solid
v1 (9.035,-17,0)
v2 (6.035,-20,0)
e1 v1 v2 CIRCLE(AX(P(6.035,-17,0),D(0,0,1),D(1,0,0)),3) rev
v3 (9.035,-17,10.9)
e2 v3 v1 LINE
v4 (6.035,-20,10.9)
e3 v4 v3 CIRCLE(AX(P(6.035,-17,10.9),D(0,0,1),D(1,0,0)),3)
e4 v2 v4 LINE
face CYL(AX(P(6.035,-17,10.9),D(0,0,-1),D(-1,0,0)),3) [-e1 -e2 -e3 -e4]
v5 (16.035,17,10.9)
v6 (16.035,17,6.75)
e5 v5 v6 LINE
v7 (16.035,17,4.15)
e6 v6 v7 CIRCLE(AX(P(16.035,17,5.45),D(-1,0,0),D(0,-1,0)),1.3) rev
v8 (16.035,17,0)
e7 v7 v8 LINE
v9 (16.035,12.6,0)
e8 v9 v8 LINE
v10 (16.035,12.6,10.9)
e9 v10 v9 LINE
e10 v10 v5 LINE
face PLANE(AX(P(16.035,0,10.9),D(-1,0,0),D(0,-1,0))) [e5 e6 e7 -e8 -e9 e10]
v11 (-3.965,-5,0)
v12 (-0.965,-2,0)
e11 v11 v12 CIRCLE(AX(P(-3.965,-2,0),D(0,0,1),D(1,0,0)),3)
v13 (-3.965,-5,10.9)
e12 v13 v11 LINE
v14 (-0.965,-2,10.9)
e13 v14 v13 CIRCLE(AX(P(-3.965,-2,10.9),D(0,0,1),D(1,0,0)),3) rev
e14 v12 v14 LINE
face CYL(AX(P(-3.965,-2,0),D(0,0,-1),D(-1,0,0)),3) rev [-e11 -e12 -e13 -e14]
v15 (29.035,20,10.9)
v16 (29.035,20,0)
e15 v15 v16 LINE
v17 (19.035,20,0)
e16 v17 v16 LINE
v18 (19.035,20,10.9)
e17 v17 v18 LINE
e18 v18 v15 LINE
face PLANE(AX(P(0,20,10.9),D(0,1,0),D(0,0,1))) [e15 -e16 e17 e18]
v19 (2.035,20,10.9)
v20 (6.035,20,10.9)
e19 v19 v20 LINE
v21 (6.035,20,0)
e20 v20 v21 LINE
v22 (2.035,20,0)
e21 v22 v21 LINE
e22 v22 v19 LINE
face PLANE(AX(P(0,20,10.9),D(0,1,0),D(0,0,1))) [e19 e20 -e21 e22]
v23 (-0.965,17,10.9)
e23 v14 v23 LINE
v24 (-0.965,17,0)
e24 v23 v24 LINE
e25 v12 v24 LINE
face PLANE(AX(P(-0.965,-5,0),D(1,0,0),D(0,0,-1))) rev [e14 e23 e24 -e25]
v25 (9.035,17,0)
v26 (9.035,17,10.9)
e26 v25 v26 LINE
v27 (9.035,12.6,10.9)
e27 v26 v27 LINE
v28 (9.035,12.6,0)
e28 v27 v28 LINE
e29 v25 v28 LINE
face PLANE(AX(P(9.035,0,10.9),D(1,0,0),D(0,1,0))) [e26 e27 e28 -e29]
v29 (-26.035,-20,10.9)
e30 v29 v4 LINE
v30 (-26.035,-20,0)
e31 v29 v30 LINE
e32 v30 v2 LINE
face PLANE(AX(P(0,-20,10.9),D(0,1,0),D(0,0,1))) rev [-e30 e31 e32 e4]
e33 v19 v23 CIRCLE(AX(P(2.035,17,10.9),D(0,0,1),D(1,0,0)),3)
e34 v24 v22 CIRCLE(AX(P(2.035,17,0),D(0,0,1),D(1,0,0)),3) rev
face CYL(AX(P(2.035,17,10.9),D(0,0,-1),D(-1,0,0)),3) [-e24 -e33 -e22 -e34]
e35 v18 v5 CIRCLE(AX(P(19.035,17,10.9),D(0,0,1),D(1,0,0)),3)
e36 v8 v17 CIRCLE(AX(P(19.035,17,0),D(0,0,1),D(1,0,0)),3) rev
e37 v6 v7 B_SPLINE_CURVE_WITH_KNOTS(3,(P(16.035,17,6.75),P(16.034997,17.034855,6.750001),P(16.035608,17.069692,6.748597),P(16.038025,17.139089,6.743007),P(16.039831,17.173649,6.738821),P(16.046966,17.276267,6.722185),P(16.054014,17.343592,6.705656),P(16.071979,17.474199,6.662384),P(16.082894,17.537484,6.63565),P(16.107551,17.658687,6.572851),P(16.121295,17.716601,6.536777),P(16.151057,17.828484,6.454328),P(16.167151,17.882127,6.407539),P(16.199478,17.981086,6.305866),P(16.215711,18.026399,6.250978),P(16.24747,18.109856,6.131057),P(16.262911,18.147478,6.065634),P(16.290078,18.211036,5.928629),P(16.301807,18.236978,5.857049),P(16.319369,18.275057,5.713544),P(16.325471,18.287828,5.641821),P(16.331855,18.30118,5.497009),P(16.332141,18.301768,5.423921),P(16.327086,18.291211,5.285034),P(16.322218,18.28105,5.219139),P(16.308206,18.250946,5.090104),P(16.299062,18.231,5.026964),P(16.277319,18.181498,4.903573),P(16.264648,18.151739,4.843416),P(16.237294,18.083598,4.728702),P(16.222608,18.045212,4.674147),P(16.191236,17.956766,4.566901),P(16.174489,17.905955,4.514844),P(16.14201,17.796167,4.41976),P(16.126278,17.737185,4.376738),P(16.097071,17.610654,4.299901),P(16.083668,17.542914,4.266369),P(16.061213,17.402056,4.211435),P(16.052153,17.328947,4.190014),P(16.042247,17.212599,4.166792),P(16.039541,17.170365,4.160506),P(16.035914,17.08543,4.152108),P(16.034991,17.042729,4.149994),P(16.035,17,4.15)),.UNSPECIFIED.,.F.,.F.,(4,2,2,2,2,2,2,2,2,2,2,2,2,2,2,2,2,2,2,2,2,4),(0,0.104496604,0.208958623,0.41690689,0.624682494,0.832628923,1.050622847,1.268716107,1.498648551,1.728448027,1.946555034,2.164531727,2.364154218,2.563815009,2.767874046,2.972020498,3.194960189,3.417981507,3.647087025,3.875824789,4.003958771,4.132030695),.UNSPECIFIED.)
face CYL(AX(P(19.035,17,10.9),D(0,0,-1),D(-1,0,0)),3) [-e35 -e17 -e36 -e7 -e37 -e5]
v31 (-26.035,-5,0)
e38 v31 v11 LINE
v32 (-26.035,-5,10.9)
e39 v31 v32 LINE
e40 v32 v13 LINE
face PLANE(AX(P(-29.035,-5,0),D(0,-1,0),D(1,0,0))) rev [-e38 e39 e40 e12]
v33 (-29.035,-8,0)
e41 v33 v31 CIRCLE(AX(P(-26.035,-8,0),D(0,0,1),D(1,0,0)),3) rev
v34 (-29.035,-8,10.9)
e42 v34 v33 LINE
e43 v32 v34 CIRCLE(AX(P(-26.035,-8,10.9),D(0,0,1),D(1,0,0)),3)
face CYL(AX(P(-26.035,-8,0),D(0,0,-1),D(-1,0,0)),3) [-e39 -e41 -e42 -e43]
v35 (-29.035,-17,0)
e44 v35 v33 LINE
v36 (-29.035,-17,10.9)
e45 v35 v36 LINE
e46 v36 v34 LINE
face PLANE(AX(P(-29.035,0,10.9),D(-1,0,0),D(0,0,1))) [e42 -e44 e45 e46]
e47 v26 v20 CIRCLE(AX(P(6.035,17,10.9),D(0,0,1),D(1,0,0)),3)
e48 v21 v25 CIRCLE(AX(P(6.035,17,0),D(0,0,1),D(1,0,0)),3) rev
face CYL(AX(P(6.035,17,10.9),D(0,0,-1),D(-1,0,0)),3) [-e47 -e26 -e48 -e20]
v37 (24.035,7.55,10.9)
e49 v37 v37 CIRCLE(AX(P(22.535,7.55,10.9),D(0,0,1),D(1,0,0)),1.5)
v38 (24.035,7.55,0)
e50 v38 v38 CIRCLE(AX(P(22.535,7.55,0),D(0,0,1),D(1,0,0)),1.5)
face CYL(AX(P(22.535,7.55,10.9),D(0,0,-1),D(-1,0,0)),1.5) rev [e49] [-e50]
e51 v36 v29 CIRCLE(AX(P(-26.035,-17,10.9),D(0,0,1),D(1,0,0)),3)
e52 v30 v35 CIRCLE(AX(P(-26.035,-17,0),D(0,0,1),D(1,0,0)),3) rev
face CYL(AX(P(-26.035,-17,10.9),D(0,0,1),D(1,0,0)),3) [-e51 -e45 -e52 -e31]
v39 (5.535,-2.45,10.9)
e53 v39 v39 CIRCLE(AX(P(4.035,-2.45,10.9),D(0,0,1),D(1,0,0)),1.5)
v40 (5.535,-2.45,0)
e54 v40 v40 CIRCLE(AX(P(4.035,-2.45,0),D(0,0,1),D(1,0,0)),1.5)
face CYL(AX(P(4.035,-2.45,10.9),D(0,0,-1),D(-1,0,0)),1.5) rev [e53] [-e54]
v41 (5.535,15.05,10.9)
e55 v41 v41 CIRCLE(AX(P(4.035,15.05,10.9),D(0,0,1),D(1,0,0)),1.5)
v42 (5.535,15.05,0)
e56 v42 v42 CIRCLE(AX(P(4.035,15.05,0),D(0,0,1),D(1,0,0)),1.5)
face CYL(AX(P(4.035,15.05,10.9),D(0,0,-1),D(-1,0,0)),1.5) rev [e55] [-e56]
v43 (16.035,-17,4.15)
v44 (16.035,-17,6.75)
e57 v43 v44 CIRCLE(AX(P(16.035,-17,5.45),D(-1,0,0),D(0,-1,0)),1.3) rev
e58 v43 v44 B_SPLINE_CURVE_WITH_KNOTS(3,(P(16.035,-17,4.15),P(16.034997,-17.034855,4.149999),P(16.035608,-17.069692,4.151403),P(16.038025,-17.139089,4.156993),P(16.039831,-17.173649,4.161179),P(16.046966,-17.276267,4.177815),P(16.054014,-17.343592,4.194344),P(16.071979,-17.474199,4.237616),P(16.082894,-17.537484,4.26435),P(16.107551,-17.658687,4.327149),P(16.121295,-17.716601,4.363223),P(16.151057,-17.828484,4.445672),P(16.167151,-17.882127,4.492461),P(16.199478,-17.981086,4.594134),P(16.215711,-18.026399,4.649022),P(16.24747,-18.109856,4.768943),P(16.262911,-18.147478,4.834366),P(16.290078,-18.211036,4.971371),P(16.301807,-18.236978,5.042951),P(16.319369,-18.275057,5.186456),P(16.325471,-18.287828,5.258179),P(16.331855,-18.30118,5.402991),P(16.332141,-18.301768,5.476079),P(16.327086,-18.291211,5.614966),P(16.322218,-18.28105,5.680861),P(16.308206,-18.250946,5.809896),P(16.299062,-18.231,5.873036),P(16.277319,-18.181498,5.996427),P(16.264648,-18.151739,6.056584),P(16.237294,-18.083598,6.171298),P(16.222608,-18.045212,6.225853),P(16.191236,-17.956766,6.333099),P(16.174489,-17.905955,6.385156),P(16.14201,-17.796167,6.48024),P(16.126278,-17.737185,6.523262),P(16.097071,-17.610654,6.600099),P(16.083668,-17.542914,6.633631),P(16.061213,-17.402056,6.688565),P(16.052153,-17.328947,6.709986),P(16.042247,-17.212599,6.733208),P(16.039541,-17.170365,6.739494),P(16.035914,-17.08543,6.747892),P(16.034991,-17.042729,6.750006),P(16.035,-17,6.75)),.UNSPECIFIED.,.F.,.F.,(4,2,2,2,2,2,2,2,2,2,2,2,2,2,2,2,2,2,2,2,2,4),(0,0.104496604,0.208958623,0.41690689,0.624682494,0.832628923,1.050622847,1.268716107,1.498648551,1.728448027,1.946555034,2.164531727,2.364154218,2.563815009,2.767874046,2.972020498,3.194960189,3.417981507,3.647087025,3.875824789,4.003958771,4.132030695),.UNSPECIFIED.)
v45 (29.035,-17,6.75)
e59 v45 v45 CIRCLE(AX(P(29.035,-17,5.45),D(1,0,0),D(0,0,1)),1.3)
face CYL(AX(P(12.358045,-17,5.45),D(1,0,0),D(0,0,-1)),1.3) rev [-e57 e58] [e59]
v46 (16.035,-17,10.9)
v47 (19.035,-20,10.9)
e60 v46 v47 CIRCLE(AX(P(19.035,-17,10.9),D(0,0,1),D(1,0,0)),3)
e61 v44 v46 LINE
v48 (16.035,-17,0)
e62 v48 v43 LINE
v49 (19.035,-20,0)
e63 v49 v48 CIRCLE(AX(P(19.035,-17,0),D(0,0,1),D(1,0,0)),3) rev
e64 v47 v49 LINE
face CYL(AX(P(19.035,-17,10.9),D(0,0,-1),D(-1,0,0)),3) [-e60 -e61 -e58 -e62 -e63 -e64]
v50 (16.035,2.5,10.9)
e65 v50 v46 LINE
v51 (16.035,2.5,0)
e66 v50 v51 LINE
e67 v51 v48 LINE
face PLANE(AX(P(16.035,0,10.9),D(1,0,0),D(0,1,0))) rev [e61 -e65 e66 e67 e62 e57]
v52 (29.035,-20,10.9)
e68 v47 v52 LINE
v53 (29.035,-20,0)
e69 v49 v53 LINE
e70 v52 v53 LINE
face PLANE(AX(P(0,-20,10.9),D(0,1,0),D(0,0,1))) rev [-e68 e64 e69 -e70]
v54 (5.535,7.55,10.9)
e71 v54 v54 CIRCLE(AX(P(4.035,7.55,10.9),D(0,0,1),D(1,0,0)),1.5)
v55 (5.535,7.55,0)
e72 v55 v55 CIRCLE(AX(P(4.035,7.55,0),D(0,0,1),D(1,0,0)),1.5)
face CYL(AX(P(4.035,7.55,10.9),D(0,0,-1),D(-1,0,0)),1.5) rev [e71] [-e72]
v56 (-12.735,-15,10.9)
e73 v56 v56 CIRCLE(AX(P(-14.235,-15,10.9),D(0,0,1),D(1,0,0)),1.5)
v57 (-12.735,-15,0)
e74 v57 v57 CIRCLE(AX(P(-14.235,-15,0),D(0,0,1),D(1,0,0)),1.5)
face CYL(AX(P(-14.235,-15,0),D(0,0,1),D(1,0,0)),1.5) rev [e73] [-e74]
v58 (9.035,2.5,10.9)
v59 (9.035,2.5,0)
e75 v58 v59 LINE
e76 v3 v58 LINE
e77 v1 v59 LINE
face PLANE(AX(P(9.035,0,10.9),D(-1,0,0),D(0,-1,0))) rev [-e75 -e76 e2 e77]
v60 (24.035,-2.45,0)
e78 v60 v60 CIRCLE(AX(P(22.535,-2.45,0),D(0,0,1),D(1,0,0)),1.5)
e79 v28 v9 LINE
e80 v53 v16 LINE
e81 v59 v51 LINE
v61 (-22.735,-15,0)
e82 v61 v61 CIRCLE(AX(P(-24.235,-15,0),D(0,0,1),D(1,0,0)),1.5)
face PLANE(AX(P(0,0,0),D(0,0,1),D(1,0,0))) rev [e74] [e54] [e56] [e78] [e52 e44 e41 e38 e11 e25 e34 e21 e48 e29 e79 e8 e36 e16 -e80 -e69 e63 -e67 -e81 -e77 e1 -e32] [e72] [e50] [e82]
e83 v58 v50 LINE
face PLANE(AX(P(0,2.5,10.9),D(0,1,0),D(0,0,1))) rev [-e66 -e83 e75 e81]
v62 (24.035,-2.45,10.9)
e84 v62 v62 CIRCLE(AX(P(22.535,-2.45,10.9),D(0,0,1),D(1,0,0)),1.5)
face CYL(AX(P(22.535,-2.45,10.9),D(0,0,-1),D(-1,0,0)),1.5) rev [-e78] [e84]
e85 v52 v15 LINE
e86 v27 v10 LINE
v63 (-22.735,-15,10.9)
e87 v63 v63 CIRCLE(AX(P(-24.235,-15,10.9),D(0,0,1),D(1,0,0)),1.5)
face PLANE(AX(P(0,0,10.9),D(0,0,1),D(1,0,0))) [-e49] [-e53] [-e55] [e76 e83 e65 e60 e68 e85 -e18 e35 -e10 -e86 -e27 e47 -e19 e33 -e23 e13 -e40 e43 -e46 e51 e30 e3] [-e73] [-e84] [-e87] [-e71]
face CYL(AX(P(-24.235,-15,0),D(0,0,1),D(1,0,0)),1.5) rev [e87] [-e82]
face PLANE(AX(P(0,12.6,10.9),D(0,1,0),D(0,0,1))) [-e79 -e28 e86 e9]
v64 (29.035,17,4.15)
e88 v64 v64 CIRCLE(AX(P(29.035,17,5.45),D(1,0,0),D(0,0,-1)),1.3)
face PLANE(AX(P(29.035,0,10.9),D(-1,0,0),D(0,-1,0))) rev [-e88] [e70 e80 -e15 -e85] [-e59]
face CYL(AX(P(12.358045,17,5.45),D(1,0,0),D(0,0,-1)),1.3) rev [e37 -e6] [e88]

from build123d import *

# Parameters (mm, degrees)
SKETCH_1_R          = 1.5
EXTRUDE_1_DEPTH     = 10.9
SKETCH_2_R          = 1.3
CUT_EXTRUDE_1_DEPTH = 13
SKETCH_5_R          = 5.1
CUT_EXTRUDE_3_DEPTH = 37.903132997
SKETCH_6_R          = 1.5
CUT_EXTRUDE_4_DEPTH = 37.903132997
SKETCH_7_W          = 28.07
SKETCH_7_H          = 25
CUT_EXTRUDE_5_DEPTH = 37.903132997
FILLET_2_R          = 3


with BuildPart() as part:
    # ｽｹｯﾁ1 → ﾎﾞｽ - 押し出し1 (new body)
    with BuildSketch(Plane.XY):
        Polygon((9.035, 12.6), (9.035, 20), (-29.035, 20), (-29.035, -20), (9.035, -20), (9.035, 2.5), (16.035, 2.5), (16.035, -20), (29.035, -20), (29.035, 20), (16.035, 20), (16.035, 12.6), align=None)
        with Locations((4.035, -2.45)):
            Circle(SKETCH_1_R, mode=Mode.SUBTRACT)
        with Locations((22.535, -2.45)):
            Circle(SKETCH_1_R, mode=Mode.SUBTRACT)
        with Locations((4.035, 7.55)):
            Circle(SKETCH_1_R, mode=Mode.SUBTRACT)
        with Locations((22.535, 7.55)):
            Circle(SKETCH_1_R, mode=Mode.SUBTRACT)
        with Locations((4.035, 15.05)):
            Circle(SKETCH_1_R, mode=Mode.SUBTRACT)
    extrude(amount=EXTRUDE_1_DEPTH)

    # ｽｹｯﾁ2 → ｶｯﾄ - 押し出し1 (cut)
    with BuildSketch(Plane(origin=(29.035, 0, 0), x_dir=(0, 0, -1), z_dir=(1, 0, 0))):
        with Locations((-5.45, 17)):
            Circle(SKETCH_2_R)
        with Locations(Location((-5.45, -17, 0), (0, 0, 270))):
            Circle(SKETCH_2_R)
    extrude(amount=-CUT_EXTRUDE_1_DEPTH, mode=Mode.SUBTRACT)

    # ｽｹｯﾁ5 → ｶｯﾄ - 押し出し3 (cut, through all)
    with BuildSketch(Plane.XY.offset(10.9)):
        with Locations((-29.035, 24)):
            Circle(SKETCH_5_R)
        with Locations((-8.935, 24)):
            Circle(SKETCH_5_R)
    extrude(amount=-CUT_EXTRUDE_3_DEPTH, mode=Mode.SUBTRACT)

    # ｽｹｯﾁ6 → ｶｯﾄ - 押し出し4 (cut, through all)
    with BuildSketch(Plane.XY.offset(10.9)):
        with Locations((-24.235, -15)):
            Circle(SKETCH_6_R)
        with Locations((-14.235, -15)):
            Circle(SKETCH_6_R)
    extrude(amount=-CUT_EXTRUDE_4_DEPTH, mode=Mode.SUBTRACT)

    # ｽｹｯﾁ7 → ｶｯﾄ - 押し出し5 (cut, through all)
    with BuildSketch(Plane.XY.offset(10.9)):
        with Locations((-15, 7.5)):
            Rectangle(SKETCH_7_W, SKETCH_7_H)
    extrude(amount=-CUT_EXTRUDE_5_DEPTH, mode=Mode.SUBTRACT)

    # ﾌｨﾚｯﾄ2
    # the kernel refuses this fillet: 3 mm, written as the material it adds along each edge
    with BuildSketch(Plane(origin=(-0.965, -5, 10.9), x_dir=(-1, 0, 0), z_dir=(0, 0, -1))) as fillet_2_piece_1:
        with BuildLine():
            CenterArc((FILLET_2_R, FILLET_2_R), FILLET_2_R, 180, 90)
            Line((0, FILLET_2_R), (0, 0))
            Line((0, 0), (FILLET_2_R, 0))
        make_face()
    extrude(amount=10.9)
    # the kernel refuses this fillet: 3 mm, written as the material it takes off along each edge
    with BuildSketch(Plane(origin=(-29.035, -5, 18.4), x_dir=(0, -1, 0), z_dir=(0, 0, -1)), Plane(origin=(-0.965, 20, 18.4), x_dir=(0, -1, 0), z_dir=(0, 0, -1))) as fillet_2_2_piece_1:
        with BuildLine():
            CenterArc((FILLET_2_R, -FILLET_2_R), FILLET_2_R, 90, 90)
            Line((0, -FILLET_2_R), (0, 0))
            Line((0, 0), (FILLET_2_R, 0))
        make_face()
    extrude(amount=25.9, mode=Mode.SUBTRACT)
    with BuildSketch(Plane(origin=(9.035, -20, -7.5), x_dir=(0, 1, 0), z_dir=(0, 0, 1)), Plane(origin=(-29.035, -20, -7.5), x_dir=(1, 0, 0), z_dir=(0, 0, 1)), Plane(origin=(9.035, 20, -7.5), x_dir=(-1, 0, 0), z_dir=(0, 0, 1)), Plane(origin=(16.035, 20, -7.5), x_dir=(0, -1, 0), z_dir=(0, 0, 1)), Plane(origin=(16.035, -20, -7.5), x_dir=(1, 0, 0), z_dir=(0, 0, 1))) as fillet_2_2_piece_2:
        with BuildLine():
            CenterArc((FILLET_2_R, FILLET_2_R), FILLET_2_R, 180, 90)
            Line((0, FILLET_2_R), (0, 0))
            Line((0, 0), (FILLET_2_R, 0))
        make_face()
    extrude(amount=25.9, mode=Mode.SUBTRACT)


solid = part.part
